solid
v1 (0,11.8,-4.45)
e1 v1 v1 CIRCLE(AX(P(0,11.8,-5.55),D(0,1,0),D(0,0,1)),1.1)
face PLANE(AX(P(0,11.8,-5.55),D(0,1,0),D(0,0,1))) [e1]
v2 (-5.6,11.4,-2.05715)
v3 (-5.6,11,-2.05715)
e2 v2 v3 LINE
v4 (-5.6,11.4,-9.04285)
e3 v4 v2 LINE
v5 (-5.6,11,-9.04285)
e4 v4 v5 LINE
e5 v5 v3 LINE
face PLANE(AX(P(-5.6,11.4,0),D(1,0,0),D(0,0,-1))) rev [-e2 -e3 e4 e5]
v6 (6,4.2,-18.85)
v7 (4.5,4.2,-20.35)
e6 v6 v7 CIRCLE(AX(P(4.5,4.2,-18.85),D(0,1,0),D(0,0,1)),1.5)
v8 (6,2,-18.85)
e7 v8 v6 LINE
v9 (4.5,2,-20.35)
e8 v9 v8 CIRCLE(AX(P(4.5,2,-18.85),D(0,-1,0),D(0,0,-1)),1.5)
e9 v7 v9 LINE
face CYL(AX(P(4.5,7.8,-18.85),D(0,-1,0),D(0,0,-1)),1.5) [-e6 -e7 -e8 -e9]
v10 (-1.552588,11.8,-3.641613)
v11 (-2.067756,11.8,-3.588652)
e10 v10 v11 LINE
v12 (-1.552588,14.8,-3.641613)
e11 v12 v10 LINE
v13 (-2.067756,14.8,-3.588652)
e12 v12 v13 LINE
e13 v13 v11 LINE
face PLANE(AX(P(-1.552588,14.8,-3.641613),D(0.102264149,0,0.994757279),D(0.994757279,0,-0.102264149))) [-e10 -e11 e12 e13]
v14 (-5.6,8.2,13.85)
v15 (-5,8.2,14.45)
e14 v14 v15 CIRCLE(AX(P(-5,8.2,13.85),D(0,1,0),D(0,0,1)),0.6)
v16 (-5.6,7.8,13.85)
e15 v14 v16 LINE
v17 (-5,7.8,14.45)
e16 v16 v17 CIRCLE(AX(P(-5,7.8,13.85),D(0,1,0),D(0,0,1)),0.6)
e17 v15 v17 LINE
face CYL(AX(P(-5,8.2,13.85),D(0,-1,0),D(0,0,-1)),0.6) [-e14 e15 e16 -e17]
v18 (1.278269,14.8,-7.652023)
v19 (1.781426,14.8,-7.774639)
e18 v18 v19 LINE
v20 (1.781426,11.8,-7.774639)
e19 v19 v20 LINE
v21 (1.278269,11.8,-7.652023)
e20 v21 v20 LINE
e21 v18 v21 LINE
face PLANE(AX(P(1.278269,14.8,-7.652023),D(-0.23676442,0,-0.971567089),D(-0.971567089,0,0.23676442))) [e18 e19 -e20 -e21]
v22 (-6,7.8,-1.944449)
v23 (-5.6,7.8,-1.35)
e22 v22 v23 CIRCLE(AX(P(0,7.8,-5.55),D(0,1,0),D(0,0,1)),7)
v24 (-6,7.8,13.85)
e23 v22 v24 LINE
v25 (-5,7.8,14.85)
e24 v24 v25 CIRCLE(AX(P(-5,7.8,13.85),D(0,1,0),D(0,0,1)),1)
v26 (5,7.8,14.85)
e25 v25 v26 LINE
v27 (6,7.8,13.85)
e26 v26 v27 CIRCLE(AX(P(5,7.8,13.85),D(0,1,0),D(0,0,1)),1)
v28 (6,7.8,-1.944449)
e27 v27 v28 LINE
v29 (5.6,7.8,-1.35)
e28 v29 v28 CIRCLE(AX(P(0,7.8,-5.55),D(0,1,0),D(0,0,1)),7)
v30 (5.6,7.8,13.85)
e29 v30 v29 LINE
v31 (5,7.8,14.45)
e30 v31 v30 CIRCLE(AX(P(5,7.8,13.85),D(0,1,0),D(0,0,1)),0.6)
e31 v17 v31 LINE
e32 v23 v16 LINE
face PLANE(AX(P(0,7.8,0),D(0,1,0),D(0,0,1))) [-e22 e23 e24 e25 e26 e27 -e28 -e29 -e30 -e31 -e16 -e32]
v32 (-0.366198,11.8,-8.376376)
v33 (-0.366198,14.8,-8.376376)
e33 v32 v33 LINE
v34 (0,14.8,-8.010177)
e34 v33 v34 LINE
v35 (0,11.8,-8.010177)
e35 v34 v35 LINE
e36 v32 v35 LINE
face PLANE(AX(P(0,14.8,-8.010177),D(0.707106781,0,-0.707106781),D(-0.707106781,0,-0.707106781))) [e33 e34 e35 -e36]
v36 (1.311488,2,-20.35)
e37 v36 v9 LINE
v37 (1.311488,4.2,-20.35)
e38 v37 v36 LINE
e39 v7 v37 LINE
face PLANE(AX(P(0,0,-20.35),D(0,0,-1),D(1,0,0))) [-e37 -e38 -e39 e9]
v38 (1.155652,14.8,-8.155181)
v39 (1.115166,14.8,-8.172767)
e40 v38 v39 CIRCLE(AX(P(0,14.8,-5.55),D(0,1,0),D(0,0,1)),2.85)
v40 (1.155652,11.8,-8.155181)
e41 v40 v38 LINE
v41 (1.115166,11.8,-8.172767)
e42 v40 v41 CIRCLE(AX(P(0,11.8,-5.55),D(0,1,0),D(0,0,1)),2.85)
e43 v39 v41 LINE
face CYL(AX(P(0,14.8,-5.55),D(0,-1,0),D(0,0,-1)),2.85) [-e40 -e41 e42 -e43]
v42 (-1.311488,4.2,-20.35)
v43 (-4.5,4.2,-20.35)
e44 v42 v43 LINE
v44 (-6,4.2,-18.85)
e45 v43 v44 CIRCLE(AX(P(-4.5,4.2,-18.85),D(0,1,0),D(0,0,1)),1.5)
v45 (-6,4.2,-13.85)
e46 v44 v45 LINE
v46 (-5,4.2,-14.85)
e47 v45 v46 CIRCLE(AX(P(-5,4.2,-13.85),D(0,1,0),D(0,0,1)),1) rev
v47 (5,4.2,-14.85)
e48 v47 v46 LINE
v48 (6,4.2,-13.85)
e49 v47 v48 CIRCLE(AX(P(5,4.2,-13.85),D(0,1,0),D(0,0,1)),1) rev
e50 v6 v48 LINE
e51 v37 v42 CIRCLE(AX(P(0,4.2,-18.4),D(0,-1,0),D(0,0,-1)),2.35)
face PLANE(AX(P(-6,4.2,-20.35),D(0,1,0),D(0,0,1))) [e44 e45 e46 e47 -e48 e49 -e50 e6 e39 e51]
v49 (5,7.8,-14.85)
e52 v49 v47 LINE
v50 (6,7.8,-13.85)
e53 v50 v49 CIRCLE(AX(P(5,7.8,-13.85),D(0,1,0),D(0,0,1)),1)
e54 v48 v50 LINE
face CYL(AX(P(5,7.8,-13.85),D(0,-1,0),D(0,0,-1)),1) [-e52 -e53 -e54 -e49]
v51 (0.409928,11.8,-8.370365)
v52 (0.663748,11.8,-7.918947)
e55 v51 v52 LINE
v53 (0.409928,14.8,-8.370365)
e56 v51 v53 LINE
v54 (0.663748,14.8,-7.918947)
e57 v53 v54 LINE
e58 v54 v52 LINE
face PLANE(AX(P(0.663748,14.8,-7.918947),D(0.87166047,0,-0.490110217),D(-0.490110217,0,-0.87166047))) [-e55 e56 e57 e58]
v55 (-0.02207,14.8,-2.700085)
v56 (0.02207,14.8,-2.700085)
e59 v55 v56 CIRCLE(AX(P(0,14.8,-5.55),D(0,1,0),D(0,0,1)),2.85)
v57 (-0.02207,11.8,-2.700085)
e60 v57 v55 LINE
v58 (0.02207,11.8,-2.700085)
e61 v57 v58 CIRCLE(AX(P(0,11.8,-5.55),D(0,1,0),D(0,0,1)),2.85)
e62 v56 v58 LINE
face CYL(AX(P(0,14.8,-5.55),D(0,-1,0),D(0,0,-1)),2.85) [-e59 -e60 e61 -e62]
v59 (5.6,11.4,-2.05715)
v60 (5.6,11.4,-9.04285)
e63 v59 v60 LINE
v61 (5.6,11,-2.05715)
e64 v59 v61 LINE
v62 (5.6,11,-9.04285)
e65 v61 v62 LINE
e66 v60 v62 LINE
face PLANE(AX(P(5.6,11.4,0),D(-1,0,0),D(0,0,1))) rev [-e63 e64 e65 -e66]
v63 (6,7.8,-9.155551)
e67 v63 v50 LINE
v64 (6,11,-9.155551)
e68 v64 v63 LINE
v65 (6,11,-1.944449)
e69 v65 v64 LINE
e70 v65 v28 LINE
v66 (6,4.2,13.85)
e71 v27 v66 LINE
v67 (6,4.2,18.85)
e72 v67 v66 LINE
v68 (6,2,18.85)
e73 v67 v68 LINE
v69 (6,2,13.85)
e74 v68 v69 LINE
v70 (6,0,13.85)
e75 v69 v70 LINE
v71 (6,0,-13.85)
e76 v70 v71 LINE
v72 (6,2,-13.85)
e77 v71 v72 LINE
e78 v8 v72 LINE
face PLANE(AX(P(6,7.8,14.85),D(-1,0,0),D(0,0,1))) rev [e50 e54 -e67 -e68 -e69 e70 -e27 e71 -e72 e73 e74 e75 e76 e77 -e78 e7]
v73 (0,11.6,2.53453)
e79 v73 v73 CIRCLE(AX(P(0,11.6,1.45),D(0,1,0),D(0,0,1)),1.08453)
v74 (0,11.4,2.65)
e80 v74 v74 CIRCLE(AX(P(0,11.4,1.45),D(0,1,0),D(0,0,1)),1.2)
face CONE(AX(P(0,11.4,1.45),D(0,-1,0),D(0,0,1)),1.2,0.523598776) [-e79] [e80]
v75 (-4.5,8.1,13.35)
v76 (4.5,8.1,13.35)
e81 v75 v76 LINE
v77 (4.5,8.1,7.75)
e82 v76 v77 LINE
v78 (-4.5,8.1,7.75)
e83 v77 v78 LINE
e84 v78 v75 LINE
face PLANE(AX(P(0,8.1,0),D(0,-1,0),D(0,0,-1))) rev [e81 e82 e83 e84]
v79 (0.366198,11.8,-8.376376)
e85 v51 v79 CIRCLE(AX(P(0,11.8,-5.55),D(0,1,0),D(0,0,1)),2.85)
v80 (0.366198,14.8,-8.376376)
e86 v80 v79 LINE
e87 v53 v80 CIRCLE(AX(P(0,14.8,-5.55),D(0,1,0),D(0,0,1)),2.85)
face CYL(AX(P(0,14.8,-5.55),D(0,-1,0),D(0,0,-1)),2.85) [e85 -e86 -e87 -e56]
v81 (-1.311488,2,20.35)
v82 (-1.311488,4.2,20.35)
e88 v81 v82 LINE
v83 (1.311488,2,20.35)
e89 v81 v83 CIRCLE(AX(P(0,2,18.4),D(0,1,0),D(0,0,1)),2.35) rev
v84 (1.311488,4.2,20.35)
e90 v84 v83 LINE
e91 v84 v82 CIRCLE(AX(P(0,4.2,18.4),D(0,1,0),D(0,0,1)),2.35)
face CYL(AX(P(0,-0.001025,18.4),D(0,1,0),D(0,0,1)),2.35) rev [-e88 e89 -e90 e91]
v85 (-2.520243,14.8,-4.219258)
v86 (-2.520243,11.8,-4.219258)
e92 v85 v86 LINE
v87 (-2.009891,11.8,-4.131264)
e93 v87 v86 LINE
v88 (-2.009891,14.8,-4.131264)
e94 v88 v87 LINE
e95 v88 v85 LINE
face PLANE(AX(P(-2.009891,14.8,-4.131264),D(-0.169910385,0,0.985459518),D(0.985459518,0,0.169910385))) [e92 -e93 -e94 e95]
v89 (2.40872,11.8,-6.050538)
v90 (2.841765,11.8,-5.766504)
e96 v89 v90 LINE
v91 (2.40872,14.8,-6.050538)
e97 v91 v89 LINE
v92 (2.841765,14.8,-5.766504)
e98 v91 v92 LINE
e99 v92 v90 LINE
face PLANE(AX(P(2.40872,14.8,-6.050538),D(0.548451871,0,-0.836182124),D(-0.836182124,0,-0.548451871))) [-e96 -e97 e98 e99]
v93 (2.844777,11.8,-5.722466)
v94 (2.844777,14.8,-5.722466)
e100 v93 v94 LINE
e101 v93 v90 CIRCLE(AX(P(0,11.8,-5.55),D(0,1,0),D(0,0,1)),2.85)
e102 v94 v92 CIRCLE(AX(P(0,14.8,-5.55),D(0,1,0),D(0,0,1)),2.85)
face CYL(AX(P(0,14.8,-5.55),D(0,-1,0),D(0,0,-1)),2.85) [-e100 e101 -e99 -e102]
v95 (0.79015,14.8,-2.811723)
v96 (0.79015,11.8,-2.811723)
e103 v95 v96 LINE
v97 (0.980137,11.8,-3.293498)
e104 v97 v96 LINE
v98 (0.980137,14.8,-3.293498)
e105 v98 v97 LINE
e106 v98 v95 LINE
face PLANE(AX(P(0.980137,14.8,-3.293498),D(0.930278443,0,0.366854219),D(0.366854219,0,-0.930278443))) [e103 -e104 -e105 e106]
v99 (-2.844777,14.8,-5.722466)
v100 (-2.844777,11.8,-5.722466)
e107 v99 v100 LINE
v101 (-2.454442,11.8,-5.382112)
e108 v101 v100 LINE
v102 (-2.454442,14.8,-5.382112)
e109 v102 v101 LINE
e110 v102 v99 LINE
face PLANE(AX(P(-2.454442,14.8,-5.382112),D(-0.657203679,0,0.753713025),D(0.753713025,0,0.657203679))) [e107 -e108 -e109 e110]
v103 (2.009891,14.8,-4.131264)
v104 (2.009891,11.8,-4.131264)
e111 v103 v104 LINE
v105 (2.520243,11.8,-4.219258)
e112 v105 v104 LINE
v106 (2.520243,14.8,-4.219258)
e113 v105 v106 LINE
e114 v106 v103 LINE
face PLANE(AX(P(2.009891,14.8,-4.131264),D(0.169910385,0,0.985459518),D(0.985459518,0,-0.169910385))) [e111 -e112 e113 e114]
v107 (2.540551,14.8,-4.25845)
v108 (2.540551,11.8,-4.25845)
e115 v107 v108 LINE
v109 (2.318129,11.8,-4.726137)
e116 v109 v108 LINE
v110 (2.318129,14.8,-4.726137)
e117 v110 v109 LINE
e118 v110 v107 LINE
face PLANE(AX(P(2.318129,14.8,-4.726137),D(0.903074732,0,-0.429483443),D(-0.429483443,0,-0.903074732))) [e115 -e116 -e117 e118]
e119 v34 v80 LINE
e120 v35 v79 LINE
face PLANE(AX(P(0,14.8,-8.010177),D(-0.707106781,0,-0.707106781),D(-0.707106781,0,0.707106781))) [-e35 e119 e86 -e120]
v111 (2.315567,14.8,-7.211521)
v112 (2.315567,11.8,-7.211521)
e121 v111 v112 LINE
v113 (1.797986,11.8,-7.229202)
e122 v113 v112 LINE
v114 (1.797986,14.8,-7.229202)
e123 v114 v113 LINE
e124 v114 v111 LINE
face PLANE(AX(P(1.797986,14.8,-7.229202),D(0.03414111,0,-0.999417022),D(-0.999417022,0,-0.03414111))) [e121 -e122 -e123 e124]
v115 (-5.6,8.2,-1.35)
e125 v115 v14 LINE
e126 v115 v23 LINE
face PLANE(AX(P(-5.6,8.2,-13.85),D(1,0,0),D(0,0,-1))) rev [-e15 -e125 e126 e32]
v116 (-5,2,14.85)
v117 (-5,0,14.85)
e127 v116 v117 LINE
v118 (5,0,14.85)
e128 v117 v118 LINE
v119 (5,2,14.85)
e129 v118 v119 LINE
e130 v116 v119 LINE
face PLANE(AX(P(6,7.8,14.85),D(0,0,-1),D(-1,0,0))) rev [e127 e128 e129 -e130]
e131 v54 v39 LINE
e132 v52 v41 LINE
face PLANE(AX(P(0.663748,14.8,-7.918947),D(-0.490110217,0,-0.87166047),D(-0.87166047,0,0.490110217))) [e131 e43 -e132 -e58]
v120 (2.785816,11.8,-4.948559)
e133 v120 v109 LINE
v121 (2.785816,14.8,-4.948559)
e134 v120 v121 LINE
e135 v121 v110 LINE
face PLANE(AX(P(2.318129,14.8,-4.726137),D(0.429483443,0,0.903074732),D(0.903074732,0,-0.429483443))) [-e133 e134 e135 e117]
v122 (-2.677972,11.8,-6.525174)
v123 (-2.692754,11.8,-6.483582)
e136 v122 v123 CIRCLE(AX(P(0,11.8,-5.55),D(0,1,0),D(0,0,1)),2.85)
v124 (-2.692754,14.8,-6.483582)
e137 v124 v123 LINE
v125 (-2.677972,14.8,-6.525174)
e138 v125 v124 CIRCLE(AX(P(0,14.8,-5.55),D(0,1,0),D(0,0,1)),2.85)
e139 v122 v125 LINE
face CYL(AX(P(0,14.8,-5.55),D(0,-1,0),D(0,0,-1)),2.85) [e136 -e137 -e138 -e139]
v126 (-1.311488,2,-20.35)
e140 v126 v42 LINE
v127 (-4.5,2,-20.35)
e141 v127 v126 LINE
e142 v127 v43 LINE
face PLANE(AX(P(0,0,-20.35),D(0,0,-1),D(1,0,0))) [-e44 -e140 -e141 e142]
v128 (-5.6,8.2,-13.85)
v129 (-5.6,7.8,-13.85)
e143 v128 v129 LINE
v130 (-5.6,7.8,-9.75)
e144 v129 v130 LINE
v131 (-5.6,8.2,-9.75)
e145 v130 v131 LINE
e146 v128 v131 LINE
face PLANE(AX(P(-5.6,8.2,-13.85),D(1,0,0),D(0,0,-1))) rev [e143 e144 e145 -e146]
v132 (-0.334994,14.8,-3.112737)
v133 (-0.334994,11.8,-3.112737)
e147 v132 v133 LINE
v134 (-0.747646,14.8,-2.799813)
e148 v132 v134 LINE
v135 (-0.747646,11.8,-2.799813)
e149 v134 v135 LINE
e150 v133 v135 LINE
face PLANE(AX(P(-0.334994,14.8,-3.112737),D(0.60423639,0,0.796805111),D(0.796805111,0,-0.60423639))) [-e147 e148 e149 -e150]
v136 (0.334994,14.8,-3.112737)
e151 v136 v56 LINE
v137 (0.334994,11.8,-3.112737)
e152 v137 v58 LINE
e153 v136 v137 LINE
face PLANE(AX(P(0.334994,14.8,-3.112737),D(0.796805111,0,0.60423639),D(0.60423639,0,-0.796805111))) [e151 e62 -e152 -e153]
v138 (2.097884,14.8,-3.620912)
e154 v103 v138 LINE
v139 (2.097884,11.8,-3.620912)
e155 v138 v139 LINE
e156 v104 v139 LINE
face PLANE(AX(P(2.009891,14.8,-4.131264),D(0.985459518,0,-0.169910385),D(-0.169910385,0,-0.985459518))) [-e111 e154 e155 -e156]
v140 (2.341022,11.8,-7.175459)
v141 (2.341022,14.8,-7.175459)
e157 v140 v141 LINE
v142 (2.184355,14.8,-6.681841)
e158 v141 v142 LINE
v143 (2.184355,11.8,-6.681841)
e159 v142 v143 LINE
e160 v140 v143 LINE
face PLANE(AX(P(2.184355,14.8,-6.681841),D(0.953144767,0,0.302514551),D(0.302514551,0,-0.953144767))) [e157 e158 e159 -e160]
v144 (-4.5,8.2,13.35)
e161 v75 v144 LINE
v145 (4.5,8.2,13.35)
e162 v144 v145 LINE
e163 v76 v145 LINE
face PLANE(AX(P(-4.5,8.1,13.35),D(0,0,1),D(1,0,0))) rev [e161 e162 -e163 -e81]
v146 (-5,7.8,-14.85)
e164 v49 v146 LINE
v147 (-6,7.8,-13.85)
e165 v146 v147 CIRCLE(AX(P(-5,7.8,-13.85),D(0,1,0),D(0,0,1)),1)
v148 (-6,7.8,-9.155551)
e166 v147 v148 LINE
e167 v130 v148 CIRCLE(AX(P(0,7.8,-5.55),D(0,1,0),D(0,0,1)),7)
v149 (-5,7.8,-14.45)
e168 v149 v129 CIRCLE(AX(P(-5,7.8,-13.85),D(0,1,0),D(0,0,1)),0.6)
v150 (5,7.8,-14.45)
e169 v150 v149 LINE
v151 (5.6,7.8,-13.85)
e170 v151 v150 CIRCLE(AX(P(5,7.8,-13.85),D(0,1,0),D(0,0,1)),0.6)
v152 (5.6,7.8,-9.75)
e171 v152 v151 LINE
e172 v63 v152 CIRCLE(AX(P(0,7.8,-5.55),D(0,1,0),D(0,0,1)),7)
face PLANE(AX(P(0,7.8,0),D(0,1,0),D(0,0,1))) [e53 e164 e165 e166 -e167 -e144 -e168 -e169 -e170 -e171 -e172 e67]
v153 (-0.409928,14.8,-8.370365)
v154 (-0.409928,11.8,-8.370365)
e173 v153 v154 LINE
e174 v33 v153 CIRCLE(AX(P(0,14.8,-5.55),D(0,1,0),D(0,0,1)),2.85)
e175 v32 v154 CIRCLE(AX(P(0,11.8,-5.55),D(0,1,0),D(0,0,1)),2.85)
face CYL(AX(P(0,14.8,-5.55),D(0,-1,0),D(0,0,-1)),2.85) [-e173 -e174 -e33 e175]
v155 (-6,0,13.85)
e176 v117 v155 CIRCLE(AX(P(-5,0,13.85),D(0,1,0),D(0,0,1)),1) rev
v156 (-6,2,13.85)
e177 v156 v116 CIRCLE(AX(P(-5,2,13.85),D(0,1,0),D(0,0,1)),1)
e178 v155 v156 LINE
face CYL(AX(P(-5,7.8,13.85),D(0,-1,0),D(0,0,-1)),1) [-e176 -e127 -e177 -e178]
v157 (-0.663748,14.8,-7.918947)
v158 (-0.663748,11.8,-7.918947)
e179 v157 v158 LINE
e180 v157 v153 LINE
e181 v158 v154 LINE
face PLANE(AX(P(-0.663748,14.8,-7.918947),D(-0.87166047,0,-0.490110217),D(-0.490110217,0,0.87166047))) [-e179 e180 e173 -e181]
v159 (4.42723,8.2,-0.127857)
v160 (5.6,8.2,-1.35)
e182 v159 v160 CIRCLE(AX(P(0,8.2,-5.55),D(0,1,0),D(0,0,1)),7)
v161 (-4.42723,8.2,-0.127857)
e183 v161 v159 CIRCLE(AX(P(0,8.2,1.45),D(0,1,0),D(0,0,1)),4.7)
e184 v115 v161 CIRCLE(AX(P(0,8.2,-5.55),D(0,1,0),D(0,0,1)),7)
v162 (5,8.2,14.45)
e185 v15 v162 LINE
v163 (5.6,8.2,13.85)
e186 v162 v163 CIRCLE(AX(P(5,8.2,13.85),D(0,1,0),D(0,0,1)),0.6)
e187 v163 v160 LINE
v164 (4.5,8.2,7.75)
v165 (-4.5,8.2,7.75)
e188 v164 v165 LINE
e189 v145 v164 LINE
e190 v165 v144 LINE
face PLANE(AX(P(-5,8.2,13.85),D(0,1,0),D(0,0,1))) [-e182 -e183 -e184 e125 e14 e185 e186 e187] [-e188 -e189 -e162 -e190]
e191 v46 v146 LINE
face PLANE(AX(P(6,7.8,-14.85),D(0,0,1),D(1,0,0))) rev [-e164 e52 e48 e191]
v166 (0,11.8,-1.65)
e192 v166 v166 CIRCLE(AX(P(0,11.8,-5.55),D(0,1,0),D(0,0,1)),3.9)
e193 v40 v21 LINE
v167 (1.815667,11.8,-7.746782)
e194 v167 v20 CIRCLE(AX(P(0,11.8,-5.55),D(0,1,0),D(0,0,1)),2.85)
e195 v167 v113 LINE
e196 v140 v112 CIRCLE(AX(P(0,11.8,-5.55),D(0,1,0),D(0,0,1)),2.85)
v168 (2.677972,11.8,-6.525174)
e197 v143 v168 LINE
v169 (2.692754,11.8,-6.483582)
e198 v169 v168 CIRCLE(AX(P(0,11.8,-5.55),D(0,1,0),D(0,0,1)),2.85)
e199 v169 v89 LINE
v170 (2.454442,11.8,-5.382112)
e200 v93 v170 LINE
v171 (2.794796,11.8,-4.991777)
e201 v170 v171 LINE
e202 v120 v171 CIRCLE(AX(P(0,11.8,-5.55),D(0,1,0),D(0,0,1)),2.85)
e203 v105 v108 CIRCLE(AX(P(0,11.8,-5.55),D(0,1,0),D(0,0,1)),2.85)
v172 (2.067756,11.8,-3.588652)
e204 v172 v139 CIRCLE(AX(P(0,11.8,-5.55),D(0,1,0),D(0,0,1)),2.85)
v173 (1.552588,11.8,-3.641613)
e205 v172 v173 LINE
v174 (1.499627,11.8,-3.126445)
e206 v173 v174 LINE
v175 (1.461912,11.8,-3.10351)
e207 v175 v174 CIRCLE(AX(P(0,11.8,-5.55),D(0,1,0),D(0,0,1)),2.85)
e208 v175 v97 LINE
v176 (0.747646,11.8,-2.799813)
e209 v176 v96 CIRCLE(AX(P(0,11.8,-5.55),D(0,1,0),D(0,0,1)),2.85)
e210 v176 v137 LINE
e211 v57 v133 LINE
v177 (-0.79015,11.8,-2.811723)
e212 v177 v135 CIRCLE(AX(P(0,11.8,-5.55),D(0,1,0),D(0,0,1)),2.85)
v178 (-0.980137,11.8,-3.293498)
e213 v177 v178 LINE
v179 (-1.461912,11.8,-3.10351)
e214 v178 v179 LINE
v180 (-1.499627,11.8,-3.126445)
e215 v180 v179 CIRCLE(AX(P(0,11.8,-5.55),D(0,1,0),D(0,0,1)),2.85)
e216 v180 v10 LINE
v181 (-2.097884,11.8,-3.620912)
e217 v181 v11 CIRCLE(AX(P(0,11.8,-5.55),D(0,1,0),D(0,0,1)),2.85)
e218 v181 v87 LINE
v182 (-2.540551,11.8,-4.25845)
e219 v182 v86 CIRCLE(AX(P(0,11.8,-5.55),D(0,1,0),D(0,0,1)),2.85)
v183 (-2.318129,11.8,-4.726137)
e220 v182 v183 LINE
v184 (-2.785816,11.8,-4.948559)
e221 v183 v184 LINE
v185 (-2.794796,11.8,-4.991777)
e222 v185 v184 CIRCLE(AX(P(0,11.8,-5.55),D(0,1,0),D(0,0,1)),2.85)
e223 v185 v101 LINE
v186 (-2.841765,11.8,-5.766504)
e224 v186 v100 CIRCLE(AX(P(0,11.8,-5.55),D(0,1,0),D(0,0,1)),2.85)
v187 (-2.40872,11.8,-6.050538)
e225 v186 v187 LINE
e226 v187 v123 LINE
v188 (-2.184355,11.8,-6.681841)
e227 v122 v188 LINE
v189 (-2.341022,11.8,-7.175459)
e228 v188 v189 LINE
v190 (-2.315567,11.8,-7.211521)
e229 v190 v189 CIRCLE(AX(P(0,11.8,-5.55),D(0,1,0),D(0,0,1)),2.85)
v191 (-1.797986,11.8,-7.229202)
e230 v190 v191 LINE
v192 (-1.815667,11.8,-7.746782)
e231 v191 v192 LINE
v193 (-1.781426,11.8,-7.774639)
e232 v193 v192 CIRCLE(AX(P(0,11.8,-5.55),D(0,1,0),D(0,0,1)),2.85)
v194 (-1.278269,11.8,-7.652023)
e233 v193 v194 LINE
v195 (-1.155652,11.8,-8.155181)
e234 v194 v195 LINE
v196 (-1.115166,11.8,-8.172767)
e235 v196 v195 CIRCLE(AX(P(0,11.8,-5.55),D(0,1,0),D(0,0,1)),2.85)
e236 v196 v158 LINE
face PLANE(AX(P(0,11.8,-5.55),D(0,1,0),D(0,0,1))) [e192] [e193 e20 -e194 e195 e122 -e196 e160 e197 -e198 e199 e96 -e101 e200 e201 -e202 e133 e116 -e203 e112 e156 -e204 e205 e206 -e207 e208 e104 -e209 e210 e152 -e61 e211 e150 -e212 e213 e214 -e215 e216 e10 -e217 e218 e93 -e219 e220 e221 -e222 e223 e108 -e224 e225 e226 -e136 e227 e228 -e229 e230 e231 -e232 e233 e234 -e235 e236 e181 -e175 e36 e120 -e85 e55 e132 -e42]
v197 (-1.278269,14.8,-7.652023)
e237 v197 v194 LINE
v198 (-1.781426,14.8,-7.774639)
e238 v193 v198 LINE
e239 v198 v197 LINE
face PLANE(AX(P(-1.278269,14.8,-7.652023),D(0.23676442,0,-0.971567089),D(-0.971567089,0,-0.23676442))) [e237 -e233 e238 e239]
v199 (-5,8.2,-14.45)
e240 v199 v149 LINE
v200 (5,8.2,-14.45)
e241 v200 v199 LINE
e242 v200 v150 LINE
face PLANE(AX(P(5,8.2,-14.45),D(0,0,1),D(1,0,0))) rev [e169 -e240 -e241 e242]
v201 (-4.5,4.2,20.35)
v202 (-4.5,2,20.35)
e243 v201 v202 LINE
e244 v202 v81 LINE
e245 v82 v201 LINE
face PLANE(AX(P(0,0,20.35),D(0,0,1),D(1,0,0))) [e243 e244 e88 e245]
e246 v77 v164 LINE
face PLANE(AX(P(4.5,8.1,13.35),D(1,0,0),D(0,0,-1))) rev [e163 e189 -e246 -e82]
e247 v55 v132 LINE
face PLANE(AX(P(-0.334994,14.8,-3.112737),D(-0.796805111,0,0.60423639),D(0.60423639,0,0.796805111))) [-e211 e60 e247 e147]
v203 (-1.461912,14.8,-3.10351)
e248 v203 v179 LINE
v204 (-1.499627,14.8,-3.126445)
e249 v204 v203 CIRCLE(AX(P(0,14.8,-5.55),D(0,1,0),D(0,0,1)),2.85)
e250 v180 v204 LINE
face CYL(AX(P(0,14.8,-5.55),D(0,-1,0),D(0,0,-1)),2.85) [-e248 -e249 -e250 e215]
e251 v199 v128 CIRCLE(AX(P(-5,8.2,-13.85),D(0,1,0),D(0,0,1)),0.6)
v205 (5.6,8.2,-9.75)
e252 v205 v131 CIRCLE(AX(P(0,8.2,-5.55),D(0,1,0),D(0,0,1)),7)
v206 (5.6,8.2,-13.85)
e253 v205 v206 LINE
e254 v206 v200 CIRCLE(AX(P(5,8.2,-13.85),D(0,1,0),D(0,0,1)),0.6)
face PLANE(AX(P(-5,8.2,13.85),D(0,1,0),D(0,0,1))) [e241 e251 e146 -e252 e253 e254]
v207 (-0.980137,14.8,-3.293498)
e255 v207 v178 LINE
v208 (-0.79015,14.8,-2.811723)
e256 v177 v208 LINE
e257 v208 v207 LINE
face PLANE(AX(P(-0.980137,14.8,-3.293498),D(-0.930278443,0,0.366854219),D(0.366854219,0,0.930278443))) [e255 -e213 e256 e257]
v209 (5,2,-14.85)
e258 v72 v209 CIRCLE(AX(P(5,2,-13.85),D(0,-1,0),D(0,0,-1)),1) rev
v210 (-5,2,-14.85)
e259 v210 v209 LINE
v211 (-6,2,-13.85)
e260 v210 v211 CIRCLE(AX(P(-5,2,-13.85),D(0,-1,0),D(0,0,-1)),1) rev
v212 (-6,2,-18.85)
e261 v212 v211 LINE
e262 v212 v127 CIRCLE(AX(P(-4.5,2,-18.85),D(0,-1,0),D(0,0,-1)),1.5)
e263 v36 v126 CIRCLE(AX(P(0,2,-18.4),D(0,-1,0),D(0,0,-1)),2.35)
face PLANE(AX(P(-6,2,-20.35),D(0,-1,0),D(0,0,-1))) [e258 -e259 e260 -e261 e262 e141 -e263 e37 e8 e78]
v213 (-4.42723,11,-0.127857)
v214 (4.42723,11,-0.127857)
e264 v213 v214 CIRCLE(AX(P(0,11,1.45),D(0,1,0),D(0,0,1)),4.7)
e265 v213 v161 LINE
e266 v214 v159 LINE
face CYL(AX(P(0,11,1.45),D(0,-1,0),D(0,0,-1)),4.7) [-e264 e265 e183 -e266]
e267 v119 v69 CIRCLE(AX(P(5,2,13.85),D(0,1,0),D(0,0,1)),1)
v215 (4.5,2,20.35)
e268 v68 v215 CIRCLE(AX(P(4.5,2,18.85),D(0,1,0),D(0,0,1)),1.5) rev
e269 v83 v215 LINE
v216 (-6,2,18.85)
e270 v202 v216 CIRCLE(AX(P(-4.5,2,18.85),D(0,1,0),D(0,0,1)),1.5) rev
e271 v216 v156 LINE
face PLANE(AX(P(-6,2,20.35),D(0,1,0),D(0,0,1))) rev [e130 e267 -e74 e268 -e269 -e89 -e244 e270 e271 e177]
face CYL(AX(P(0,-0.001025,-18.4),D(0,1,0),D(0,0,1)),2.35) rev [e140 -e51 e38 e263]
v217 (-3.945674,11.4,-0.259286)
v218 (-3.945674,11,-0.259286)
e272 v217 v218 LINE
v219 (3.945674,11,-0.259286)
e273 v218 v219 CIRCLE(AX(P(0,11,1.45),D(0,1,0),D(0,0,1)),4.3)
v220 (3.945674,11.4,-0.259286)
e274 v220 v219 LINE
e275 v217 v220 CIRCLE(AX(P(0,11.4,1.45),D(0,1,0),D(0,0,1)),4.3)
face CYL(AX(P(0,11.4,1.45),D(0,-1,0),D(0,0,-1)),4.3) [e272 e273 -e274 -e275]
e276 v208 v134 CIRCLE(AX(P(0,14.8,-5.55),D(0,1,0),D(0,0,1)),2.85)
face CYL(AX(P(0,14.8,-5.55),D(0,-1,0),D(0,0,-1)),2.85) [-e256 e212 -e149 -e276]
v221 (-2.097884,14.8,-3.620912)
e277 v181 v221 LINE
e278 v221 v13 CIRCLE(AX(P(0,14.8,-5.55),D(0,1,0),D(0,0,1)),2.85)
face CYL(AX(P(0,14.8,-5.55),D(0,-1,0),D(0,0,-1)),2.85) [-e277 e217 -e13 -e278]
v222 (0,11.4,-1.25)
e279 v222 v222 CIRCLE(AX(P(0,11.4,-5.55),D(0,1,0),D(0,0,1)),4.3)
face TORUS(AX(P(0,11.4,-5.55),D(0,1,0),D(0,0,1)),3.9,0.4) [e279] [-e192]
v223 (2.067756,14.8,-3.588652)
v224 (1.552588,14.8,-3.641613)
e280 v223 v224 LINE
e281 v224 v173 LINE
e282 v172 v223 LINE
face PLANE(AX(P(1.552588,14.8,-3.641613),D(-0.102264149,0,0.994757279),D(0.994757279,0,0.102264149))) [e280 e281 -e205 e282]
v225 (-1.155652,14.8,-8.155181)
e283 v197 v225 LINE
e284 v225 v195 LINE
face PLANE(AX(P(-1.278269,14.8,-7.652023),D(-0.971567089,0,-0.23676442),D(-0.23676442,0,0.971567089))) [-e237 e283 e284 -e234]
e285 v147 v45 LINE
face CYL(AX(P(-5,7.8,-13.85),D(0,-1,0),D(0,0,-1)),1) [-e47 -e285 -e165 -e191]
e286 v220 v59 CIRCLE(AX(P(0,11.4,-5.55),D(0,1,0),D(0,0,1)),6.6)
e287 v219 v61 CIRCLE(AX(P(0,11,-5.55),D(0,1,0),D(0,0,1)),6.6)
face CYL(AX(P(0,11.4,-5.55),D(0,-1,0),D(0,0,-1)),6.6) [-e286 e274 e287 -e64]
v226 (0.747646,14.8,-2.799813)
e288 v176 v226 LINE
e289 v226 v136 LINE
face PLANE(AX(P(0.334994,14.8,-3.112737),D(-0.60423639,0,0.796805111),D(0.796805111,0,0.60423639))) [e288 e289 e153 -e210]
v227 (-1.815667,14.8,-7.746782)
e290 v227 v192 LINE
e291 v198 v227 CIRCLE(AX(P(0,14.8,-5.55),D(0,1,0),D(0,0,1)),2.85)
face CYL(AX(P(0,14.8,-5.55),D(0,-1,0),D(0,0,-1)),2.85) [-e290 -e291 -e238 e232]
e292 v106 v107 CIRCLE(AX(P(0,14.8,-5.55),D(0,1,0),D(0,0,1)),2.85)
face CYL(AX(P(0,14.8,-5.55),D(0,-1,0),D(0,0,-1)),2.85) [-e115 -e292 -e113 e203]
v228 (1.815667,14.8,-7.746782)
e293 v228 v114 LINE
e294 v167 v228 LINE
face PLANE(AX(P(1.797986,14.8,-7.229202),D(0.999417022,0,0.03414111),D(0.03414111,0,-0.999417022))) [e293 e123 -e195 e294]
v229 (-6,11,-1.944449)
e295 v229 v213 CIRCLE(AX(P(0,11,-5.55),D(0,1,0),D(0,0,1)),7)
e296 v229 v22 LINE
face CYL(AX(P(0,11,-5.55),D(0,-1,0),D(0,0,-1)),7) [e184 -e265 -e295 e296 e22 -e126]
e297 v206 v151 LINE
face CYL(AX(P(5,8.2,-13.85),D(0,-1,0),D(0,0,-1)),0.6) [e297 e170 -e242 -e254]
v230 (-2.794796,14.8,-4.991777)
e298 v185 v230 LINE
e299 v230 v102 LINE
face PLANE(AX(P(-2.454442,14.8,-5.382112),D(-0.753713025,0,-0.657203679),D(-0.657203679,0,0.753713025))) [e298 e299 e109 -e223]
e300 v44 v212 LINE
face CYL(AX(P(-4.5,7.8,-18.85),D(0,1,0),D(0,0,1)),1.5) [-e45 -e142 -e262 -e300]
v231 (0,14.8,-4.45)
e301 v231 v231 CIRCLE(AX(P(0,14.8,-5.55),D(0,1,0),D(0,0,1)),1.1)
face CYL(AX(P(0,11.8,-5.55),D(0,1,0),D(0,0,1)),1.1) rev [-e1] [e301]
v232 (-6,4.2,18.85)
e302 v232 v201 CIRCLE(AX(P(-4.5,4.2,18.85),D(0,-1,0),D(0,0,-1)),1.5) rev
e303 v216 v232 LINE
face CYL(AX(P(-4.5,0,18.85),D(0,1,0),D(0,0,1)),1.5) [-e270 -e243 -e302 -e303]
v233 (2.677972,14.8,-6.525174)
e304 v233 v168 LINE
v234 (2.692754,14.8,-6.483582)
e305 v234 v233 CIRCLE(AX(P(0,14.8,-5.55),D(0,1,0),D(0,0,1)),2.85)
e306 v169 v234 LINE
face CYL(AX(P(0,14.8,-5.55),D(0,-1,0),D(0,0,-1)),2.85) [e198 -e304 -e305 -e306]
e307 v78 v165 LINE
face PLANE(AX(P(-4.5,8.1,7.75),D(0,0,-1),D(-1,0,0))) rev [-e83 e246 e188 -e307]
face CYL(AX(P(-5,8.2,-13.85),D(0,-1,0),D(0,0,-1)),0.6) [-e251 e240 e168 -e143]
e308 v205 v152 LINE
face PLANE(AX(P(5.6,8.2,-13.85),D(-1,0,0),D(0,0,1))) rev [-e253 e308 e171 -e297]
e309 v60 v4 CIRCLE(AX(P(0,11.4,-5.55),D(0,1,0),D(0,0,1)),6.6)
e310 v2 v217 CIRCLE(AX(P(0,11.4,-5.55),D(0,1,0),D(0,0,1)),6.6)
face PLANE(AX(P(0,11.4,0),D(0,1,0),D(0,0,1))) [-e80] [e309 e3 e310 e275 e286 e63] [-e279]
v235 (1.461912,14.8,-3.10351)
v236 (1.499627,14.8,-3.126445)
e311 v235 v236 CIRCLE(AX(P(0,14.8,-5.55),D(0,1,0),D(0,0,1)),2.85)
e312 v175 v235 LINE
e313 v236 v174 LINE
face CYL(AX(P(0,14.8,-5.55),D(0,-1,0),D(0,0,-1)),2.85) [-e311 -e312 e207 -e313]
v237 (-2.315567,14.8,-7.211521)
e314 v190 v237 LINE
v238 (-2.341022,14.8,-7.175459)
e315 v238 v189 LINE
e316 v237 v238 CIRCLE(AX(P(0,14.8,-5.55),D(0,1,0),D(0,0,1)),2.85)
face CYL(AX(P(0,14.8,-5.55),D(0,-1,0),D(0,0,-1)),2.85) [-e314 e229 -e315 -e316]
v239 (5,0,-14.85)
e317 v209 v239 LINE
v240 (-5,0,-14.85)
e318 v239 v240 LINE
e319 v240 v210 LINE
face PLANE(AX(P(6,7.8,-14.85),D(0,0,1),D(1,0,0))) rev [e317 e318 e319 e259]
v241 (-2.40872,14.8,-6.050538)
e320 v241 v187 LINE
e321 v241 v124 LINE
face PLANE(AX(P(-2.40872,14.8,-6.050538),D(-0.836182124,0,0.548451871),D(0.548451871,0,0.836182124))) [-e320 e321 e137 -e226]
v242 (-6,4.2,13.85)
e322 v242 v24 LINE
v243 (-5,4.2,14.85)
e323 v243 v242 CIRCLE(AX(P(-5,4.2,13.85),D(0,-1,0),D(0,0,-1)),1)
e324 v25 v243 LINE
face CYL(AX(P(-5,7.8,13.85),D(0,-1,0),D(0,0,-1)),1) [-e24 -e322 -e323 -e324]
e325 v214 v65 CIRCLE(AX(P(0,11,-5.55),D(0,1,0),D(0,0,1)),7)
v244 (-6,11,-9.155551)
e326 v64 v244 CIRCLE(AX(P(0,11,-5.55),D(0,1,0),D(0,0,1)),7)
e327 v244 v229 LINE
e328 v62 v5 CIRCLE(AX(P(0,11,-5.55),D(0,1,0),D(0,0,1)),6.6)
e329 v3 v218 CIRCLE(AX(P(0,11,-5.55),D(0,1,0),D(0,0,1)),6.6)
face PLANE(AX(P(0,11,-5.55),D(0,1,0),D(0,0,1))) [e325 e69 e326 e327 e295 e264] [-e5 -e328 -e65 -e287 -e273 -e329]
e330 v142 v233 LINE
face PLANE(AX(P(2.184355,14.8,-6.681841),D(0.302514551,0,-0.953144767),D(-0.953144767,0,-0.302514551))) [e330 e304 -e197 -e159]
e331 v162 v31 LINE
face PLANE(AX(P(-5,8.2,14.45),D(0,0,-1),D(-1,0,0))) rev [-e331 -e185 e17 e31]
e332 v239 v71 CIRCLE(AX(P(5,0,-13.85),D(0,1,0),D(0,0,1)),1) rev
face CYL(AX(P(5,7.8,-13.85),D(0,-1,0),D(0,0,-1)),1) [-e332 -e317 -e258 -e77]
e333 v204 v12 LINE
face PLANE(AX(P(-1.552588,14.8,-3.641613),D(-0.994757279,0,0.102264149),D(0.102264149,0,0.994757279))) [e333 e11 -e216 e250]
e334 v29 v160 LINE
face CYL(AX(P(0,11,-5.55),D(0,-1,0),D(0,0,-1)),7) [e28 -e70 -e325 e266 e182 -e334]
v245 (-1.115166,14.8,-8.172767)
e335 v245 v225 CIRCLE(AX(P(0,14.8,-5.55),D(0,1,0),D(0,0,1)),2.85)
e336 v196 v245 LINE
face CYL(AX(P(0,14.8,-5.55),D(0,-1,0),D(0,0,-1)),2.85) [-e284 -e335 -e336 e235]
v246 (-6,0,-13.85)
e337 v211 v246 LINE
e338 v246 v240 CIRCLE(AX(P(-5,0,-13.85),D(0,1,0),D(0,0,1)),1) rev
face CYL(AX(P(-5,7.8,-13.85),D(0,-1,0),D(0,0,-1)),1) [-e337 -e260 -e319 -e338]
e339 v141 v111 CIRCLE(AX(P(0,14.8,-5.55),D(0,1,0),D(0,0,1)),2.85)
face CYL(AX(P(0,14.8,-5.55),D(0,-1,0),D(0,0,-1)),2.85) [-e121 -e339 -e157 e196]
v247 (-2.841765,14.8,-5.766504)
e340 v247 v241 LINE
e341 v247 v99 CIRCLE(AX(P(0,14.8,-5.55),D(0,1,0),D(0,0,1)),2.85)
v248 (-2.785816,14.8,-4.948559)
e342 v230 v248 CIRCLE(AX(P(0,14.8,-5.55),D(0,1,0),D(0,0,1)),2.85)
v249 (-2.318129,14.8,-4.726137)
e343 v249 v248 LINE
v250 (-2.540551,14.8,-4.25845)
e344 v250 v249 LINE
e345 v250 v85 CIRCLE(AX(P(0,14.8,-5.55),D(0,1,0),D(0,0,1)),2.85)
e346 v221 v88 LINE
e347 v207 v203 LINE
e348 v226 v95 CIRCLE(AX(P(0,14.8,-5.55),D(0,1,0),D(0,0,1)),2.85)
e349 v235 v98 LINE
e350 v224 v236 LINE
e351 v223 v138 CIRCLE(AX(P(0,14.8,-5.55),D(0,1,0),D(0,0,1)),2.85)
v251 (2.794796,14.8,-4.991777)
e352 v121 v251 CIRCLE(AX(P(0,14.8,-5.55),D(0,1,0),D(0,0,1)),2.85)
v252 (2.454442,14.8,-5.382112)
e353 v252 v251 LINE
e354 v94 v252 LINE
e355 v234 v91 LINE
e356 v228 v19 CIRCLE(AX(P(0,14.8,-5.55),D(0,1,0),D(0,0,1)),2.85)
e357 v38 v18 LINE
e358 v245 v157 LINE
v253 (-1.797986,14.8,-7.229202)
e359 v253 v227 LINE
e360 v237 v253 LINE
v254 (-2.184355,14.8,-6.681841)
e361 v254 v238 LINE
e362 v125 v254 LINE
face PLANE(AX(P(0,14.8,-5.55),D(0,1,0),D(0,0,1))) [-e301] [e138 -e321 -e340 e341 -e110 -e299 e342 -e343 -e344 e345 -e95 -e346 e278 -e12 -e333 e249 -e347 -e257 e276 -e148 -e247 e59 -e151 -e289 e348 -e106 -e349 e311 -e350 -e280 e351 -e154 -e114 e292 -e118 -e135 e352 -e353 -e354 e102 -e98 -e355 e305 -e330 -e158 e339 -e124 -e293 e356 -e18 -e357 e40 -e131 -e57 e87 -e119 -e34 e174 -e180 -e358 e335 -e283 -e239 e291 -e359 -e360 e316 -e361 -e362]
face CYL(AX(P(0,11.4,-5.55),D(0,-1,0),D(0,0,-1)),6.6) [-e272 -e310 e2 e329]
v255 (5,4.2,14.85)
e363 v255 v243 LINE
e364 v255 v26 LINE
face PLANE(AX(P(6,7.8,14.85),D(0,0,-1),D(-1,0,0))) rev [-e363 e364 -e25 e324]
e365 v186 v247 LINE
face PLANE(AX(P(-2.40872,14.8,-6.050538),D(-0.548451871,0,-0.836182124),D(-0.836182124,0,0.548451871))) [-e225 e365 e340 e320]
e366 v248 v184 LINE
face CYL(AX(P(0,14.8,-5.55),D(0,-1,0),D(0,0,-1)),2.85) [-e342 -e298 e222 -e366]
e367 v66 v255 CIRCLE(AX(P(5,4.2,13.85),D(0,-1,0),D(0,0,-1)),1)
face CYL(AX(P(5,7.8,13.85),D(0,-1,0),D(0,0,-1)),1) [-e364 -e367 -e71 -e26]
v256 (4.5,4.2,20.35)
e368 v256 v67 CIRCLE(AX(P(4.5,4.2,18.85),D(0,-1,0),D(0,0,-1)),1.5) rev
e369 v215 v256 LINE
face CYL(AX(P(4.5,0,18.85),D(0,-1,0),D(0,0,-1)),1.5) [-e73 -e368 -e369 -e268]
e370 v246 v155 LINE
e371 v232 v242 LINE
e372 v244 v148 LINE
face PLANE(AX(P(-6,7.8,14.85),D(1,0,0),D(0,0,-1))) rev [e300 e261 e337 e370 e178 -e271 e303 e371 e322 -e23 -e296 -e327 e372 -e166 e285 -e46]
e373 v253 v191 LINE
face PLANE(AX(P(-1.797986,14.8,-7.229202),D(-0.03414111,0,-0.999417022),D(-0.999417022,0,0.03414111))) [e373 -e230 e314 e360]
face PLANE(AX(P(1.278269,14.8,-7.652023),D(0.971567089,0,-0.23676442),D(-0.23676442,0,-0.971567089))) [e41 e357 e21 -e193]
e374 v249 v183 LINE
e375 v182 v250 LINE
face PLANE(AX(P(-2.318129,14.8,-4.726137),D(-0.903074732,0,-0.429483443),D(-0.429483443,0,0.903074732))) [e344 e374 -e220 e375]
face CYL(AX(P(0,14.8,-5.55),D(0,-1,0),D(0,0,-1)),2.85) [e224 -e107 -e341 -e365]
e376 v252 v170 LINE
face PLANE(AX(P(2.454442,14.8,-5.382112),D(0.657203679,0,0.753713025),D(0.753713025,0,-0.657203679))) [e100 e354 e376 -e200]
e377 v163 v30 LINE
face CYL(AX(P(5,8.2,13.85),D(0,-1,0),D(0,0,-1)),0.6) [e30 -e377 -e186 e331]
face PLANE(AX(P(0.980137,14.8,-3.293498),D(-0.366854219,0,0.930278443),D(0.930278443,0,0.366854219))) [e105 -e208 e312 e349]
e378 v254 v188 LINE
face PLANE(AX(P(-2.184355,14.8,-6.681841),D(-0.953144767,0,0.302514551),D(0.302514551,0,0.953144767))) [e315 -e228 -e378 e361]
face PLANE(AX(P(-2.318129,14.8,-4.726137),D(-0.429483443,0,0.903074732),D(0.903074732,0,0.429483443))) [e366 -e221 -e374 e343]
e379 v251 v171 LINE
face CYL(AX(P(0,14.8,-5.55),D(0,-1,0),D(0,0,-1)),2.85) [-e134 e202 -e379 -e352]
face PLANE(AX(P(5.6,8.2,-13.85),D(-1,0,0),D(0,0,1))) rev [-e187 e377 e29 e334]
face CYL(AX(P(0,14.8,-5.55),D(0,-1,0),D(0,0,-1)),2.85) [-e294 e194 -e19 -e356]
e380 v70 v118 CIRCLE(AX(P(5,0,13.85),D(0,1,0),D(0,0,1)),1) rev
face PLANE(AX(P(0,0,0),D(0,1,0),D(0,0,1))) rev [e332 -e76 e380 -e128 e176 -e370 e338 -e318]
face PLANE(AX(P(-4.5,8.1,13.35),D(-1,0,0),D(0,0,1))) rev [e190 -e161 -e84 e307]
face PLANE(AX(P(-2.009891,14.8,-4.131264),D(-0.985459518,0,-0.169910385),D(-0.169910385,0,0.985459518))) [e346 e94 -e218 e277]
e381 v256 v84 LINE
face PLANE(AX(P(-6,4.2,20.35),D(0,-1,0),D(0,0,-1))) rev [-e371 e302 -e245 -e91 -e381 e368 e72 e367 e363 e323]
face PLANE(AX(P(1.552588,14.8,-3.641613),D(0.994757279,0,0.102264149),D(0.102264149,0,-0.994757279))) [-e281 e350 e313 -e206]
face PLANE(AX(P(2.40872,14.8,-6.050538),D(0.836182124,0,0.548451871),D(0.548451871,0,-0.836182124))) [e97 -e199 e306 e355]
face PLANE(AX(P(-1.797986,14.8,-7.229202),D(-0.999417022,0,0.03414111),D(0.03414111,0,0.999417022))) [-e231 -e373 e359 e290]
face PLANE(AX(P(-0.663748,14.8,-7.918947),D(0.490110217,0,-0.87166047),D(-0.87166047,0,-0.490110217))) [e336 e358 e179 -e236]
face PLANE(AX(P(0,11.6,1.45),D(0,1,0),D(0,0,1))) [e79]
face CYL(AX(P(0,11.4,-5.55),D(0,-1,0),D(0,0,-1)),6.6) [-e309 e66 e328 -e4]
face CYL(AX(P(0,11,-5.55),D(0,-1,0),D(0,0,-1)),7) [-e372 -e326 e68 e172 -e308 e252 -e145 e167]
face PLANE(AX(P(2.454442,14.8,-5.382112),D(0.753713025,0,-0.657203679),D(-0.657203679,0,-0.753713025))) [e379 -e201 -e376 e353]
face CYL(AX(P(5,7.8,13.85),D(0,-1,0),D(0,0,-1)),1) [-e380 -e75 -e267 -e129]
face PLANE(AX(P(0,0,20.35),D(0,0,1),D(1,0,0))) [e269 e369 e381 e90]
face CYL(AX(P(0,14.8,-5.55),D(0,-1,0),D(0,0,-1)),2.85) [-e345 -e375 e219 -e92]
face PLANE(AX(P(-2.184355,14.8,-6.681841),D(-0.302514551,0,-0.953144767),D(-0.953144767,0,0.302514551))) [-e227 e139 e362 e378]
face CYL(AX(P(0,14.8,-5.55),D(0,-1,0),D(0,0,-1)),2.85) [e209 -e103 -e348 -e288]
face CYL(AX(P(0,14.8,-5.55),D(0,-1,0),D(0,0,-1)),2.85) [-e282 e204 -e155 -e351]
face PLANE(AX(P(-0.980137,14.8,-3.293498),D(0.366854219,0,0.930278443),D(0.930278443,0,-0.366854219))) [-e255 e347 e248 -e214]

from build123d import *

# Parameters (mm, degrees)
SKETCH2_W            = 12
SKETCH2_H            = 29.7
BOSS_EXTRUDE1_DEPTH  = 7.8
SKETCH3_W            = 12
SKETCH3_H            = 2.2
BOSS_EXTRUDE2_DEPTH  = 5.5
CUT_EXTRUDE1_REACH   = 23.628
SKETCH4_R            = 2.35
FILLET1_R            = 1.5
FILLET1_OF_MIRROR1_R = 1.5
FILLET2_R            = 1
BOSS_EXTRUDE3_DEPTH  = 3.2
BOSS_EXTRUDE4_DEPTH  = 0.4
BOSS_EXTRUDE7_DEPTH  = 0.4
SKETCH8_R            = 1.2
BOSS_EXTRUDE6_DEPTH  = 0.2
BOSS_EXTRUDE6_TAPER  = 30
SKETCH7_R            = 2.85
BOSS_EXTRUDE5_DEPTH  = 3.4
SKETCH9_W            = 9
SKETCH9_H            = 5.6
CUT_EXTRUDE2_DEPTH   = 0.1
SKETCH10_R           = 1.1
CUT_EXTRUDE3_DEPTH   = 3
SKETCH13_R           = 4.3
BOSS_EXTRUDE8_DEPTH  = 0.4
FILLET3_R            = 0.4
CUT_EXTRUDE4_DEPTH   = 25.276789326
CIRPATTERN1_COUNT    = 23


with BuildPart() as part:
    # Sketch2 → Boss-Extrude1 (new body)
    with BuildSketch(Plane(origin=(0, 0, 0), x_dir=(1, 0, 0), z_dir=(0, 1, 0))):
        Rectangle(SKETCH2_W, SKETCH2_H)
    extrude(amount=BOSS_EXTRUDE1_DEPTH)

    # Sketch3 → Boss-Extrude2 (add)
    with BuildSketch(Plane.XY.offset(14.85)):
        with Locations((0, 3.1)):
            Rectangle(SKETCH3_W, SKETCH3_H)
    boss_extrude2 = extrude(amount=BOSS_EXTRUDE2_DEPTH)

    # Sketch4 → Cut-Extrude1 (cut, up to next)
    with BuildSketch(Plane(origin=(0, 4.2, 0), x_dir=(1, 0, 0), z_dir=(0, 1, 0)), mode=Mode.PRIVATE) as cut_extrude1_sk1:
        with Locations((0, -18.4)):
            Circle(SKETCH4_R)
    cut_extrude1_tool1 = extrude(cut_extrude1_sk1.sketch, amount=-CUT_EXTRUDE1_REACH, mode=Mode.PRIVATE) & part.part
    cut_extrude1 = cut_extrude1_tool1.solids().sort_by_distance((0, 4.2, 18.4))[0]
    add(cut_extrude1, mode=Mode.SUBTRACT)

    # Fillet1
    fillet1_edges = [part.edges().sort_by_distance(p)[0] for p in [
        (6, 3.1, 20.35),
        (-6, 3.1, 20.35),
    ]]
    fillet(fillet1_edges, radius=FILLET1_R)

    # Mirror1: Boss-Extrude2, Cut-Extrude1 across plane
    add(boss_extrude2.mirror(Plane.XY))
    add(cut_extrude1.mirror(Plane.XY), mode=Mode.SUBTRACT)

    # Fillet1 of Mirror1
    fillet1_of_mirror1_edges = [part.edges().sort_by_distance(p)[0] for p in [
        (6, 3.1, -20.35),
        (-6, 3.1, -20.35),
    ]]
    fillet(fillet1_of_mirror1_edges, radius=FILLET1_OF_MIRROR1_R)

    # Fillet2
    fillet2_edges = [part.edges().sort_by_distance(p)[0] for p in [
        (6, 1, 14.85),
        (6, 6, 14.85),
        (-6, 1, 14.85),
        (-6, 6, 14.85),
        (6, 1, -14.85),
        (6, 6, -14.85),
        (-6, 6, -14.85),
        (-6, 1, -14.85),
    ]]
    fillet(fillet2_edges, radius=FILLET2_R)

    # Sketch5 → Boss-Extrude3 (add)
    with BuildSketch(Plane(origin=(0, 7.8, 0), x_dir=(1, 0, 0), z_dir=(0, 1, 0))):
        with BuildLine():
            Line((-6, 9.155551275), (-6, 1.944448725))
            ThreePointArc((-6, 1.944448725), (-5.292143556, 0.968164496), (-4.427230154, 0.127857143))
            ThreePointArc((-4.427230154, 0.127857143), (0, -6.15), (4.427230154, 0.127857143))
            ThreePointArc((4.427230154, 0.127857143), (5.292143556, 0.968164496), (6, 1.944448725))
            Line((6, 1.944448725), (6, 9.155551275))
            ThreePointArc((6, 9.155551275), (0, 12.55), (-6, 9.155551275))
        make_face()
    extrude(amount=BOSS_EXTRUDE3_DEPTH)

    # Sketch6 → Boss-Extrude4 (add)
    with BuildSketch(Plane(origin=(0, 11, 0), x_dir=(1, 0, 0), z_dir=(0, 1, 0))):
        with BuildLine():
            Line((5.6, 2.057150161), (5.6, 9.042849839))
            ThreePointArc((5.6, 9.042849839), (0, 12.15), (-5.6, 9.042849839))
            Line((-5.6, 9.042849839), (-5.6, 2.057150161))
            ThreePointArc((-5.6, 2.057150161), (-4.856753194, 1.081001408), (-3.945673877, 0.259285714))
            ThreePointArc((-3.945673877, 0.259285714), (0, -5.75), (3.945673877, 0.259285714))
            ThreePointArc((3.945673877, 0.259285714), (4.856753194, 1.081001408), (5.6, 2.057150161))
        make_face()
    extrude(amount=BOSS_EXTRUDE4_DEPTH)

    # Sketch11 → Boss-Extrude7 (add)
    with BuildSketch(Plane(origin=(0, 7.8, 0), x_dir=(1, 0, 0), z_dir=(0, 1, 0))):
        with BuildLine():
            Line((-5.6, 13.85), (-5.6, -13.85))
            ThreePointArc((-5.6, -13.85), (-5.424264069, -14.274264069), (-5, -14.45))
            Line((-5, -14.45), (5, -14.45))
            ThreePointArc((5, -14.45), (5.424264069, -14.274264069), (5.6, -13.85))
            Line((5.6, -13.85), (5.6, 13.85))
            ThreePointArc((5.6, 13.85), (5.424264069, 14.274264069), (5, 14.45))
            Line((5, 14.45), (-5, 14.45))
            ThreePointArc((-5, 14.45), (-5.424264069, 14.274264069), (-5.6, 13.85))
        make_face()
    extrude(amount=BOSS_EXTRUDE7_DEPTH)

    # Sketch8 → Boss-Extrude6 (add)
    with BuildSketch(Plane(origin=(0, 11.4, 0), x_dir=(1, 0, 0), z_dir=(0, 1, 0))):
        with Locations((0, -1.45)):
            Circle(SKETCH8_R)
    extrude(amount=BOSS_EXTRUDE6_DEPTH, taper=BOSS_EXTRUDE6_TAPER)

    # Sketch7 → Boss-Extrude5 (add)
    with BuildSketch(Plane(origin=(0, 11.4, 0), x_dir=(1, 0, 0), z_dir=(0, 1, 0))):
        with Locations(Location((0, 5.55, 0), (0, 0, 270))):
            Circle(SKETCH7_R)
    extrude(amount=BOSS_EXTRUDE5_DEPTH)

    # Sketch9 → Cut-Extrude2 (cut)
    with BuildSketch(Plane(origin=(0, 8.2, 0), x_dir=(1, 0, 0), z_dir=(0, 1, 0))):
        with Locations((0, -10.55)):
            Rectangle(SKETCH9_W, SKETCH9_H)
    extrude(amount=-CUT_EXTRUDE2_DEPTH, mode=Mode.SUBTRACT)

    # Sketch10 → Cut-Extrude3 (cut)
    with BuildSketch(Plane(origin=(0, 14.8, 0), x_dir=(1, 0, 0), z_dir=(0, 1, 0))):
        with Locations(Location((0, 5.55, 0), (0, 0, 270))):
            Circle(SKETCH10_R)
    extrude(amount=-CUT_EXTRUDE3_DEPTH, mode=Mode.SUBTRACT)

    # Sketch13 → Boss-Extrude8 (add)
    with BuildSketch(Plane(origin=(0, 11.4, 0), x_dir=(1, 0, 0), z_dir=(0, 1, 0))):
        with Locations(Location((0, 5.55, 0), (0, 0, 270))):
            Circle(SKETCH13_R)
    extrude(amount=BOSS_EXTRUDE8_DEPTH)

    # Fillet3
    fillet3_edges = [part.edges().sort_by_distance(p)[0] for p in [
        (0, 11.8, -9.85),
    ]]
    fillet(fillet3_edges, radius=FILLET3_R - 0.0001)  # a hair under: the kernel refuses the full size

    # Sketch12 → Cut-Extrude4 (cut, through all)
    with BuildSketch(Plane(origin=(0, 11.8, 0), x_dir=(1, 0, 0), z_dir=(0, 1, 0))):
        Polygon((0, 8.010177118), (-0.466249863, 8.476426981), (0.466249863, 8.476426981), align=None)
    cut_extrude4 = extrude(amount=CUT_EXTRUDE4_DEPTH, mode=Mode.SUBTRACT)

    # CirPattern1: Cut-Extrude4 ×23 about axis
    cirpattern1_axis = Axis((0, 0, -5.55), (0, 1, 0))
    for i in range(1, CIRPATTERN1_COUNT):
        add(cut_extrude4.rotate(cirpattern1_axis, i * 360 / CIRPATTERN1_COUNT), mode=Mode.SUBTRACT)


solid = part.part
